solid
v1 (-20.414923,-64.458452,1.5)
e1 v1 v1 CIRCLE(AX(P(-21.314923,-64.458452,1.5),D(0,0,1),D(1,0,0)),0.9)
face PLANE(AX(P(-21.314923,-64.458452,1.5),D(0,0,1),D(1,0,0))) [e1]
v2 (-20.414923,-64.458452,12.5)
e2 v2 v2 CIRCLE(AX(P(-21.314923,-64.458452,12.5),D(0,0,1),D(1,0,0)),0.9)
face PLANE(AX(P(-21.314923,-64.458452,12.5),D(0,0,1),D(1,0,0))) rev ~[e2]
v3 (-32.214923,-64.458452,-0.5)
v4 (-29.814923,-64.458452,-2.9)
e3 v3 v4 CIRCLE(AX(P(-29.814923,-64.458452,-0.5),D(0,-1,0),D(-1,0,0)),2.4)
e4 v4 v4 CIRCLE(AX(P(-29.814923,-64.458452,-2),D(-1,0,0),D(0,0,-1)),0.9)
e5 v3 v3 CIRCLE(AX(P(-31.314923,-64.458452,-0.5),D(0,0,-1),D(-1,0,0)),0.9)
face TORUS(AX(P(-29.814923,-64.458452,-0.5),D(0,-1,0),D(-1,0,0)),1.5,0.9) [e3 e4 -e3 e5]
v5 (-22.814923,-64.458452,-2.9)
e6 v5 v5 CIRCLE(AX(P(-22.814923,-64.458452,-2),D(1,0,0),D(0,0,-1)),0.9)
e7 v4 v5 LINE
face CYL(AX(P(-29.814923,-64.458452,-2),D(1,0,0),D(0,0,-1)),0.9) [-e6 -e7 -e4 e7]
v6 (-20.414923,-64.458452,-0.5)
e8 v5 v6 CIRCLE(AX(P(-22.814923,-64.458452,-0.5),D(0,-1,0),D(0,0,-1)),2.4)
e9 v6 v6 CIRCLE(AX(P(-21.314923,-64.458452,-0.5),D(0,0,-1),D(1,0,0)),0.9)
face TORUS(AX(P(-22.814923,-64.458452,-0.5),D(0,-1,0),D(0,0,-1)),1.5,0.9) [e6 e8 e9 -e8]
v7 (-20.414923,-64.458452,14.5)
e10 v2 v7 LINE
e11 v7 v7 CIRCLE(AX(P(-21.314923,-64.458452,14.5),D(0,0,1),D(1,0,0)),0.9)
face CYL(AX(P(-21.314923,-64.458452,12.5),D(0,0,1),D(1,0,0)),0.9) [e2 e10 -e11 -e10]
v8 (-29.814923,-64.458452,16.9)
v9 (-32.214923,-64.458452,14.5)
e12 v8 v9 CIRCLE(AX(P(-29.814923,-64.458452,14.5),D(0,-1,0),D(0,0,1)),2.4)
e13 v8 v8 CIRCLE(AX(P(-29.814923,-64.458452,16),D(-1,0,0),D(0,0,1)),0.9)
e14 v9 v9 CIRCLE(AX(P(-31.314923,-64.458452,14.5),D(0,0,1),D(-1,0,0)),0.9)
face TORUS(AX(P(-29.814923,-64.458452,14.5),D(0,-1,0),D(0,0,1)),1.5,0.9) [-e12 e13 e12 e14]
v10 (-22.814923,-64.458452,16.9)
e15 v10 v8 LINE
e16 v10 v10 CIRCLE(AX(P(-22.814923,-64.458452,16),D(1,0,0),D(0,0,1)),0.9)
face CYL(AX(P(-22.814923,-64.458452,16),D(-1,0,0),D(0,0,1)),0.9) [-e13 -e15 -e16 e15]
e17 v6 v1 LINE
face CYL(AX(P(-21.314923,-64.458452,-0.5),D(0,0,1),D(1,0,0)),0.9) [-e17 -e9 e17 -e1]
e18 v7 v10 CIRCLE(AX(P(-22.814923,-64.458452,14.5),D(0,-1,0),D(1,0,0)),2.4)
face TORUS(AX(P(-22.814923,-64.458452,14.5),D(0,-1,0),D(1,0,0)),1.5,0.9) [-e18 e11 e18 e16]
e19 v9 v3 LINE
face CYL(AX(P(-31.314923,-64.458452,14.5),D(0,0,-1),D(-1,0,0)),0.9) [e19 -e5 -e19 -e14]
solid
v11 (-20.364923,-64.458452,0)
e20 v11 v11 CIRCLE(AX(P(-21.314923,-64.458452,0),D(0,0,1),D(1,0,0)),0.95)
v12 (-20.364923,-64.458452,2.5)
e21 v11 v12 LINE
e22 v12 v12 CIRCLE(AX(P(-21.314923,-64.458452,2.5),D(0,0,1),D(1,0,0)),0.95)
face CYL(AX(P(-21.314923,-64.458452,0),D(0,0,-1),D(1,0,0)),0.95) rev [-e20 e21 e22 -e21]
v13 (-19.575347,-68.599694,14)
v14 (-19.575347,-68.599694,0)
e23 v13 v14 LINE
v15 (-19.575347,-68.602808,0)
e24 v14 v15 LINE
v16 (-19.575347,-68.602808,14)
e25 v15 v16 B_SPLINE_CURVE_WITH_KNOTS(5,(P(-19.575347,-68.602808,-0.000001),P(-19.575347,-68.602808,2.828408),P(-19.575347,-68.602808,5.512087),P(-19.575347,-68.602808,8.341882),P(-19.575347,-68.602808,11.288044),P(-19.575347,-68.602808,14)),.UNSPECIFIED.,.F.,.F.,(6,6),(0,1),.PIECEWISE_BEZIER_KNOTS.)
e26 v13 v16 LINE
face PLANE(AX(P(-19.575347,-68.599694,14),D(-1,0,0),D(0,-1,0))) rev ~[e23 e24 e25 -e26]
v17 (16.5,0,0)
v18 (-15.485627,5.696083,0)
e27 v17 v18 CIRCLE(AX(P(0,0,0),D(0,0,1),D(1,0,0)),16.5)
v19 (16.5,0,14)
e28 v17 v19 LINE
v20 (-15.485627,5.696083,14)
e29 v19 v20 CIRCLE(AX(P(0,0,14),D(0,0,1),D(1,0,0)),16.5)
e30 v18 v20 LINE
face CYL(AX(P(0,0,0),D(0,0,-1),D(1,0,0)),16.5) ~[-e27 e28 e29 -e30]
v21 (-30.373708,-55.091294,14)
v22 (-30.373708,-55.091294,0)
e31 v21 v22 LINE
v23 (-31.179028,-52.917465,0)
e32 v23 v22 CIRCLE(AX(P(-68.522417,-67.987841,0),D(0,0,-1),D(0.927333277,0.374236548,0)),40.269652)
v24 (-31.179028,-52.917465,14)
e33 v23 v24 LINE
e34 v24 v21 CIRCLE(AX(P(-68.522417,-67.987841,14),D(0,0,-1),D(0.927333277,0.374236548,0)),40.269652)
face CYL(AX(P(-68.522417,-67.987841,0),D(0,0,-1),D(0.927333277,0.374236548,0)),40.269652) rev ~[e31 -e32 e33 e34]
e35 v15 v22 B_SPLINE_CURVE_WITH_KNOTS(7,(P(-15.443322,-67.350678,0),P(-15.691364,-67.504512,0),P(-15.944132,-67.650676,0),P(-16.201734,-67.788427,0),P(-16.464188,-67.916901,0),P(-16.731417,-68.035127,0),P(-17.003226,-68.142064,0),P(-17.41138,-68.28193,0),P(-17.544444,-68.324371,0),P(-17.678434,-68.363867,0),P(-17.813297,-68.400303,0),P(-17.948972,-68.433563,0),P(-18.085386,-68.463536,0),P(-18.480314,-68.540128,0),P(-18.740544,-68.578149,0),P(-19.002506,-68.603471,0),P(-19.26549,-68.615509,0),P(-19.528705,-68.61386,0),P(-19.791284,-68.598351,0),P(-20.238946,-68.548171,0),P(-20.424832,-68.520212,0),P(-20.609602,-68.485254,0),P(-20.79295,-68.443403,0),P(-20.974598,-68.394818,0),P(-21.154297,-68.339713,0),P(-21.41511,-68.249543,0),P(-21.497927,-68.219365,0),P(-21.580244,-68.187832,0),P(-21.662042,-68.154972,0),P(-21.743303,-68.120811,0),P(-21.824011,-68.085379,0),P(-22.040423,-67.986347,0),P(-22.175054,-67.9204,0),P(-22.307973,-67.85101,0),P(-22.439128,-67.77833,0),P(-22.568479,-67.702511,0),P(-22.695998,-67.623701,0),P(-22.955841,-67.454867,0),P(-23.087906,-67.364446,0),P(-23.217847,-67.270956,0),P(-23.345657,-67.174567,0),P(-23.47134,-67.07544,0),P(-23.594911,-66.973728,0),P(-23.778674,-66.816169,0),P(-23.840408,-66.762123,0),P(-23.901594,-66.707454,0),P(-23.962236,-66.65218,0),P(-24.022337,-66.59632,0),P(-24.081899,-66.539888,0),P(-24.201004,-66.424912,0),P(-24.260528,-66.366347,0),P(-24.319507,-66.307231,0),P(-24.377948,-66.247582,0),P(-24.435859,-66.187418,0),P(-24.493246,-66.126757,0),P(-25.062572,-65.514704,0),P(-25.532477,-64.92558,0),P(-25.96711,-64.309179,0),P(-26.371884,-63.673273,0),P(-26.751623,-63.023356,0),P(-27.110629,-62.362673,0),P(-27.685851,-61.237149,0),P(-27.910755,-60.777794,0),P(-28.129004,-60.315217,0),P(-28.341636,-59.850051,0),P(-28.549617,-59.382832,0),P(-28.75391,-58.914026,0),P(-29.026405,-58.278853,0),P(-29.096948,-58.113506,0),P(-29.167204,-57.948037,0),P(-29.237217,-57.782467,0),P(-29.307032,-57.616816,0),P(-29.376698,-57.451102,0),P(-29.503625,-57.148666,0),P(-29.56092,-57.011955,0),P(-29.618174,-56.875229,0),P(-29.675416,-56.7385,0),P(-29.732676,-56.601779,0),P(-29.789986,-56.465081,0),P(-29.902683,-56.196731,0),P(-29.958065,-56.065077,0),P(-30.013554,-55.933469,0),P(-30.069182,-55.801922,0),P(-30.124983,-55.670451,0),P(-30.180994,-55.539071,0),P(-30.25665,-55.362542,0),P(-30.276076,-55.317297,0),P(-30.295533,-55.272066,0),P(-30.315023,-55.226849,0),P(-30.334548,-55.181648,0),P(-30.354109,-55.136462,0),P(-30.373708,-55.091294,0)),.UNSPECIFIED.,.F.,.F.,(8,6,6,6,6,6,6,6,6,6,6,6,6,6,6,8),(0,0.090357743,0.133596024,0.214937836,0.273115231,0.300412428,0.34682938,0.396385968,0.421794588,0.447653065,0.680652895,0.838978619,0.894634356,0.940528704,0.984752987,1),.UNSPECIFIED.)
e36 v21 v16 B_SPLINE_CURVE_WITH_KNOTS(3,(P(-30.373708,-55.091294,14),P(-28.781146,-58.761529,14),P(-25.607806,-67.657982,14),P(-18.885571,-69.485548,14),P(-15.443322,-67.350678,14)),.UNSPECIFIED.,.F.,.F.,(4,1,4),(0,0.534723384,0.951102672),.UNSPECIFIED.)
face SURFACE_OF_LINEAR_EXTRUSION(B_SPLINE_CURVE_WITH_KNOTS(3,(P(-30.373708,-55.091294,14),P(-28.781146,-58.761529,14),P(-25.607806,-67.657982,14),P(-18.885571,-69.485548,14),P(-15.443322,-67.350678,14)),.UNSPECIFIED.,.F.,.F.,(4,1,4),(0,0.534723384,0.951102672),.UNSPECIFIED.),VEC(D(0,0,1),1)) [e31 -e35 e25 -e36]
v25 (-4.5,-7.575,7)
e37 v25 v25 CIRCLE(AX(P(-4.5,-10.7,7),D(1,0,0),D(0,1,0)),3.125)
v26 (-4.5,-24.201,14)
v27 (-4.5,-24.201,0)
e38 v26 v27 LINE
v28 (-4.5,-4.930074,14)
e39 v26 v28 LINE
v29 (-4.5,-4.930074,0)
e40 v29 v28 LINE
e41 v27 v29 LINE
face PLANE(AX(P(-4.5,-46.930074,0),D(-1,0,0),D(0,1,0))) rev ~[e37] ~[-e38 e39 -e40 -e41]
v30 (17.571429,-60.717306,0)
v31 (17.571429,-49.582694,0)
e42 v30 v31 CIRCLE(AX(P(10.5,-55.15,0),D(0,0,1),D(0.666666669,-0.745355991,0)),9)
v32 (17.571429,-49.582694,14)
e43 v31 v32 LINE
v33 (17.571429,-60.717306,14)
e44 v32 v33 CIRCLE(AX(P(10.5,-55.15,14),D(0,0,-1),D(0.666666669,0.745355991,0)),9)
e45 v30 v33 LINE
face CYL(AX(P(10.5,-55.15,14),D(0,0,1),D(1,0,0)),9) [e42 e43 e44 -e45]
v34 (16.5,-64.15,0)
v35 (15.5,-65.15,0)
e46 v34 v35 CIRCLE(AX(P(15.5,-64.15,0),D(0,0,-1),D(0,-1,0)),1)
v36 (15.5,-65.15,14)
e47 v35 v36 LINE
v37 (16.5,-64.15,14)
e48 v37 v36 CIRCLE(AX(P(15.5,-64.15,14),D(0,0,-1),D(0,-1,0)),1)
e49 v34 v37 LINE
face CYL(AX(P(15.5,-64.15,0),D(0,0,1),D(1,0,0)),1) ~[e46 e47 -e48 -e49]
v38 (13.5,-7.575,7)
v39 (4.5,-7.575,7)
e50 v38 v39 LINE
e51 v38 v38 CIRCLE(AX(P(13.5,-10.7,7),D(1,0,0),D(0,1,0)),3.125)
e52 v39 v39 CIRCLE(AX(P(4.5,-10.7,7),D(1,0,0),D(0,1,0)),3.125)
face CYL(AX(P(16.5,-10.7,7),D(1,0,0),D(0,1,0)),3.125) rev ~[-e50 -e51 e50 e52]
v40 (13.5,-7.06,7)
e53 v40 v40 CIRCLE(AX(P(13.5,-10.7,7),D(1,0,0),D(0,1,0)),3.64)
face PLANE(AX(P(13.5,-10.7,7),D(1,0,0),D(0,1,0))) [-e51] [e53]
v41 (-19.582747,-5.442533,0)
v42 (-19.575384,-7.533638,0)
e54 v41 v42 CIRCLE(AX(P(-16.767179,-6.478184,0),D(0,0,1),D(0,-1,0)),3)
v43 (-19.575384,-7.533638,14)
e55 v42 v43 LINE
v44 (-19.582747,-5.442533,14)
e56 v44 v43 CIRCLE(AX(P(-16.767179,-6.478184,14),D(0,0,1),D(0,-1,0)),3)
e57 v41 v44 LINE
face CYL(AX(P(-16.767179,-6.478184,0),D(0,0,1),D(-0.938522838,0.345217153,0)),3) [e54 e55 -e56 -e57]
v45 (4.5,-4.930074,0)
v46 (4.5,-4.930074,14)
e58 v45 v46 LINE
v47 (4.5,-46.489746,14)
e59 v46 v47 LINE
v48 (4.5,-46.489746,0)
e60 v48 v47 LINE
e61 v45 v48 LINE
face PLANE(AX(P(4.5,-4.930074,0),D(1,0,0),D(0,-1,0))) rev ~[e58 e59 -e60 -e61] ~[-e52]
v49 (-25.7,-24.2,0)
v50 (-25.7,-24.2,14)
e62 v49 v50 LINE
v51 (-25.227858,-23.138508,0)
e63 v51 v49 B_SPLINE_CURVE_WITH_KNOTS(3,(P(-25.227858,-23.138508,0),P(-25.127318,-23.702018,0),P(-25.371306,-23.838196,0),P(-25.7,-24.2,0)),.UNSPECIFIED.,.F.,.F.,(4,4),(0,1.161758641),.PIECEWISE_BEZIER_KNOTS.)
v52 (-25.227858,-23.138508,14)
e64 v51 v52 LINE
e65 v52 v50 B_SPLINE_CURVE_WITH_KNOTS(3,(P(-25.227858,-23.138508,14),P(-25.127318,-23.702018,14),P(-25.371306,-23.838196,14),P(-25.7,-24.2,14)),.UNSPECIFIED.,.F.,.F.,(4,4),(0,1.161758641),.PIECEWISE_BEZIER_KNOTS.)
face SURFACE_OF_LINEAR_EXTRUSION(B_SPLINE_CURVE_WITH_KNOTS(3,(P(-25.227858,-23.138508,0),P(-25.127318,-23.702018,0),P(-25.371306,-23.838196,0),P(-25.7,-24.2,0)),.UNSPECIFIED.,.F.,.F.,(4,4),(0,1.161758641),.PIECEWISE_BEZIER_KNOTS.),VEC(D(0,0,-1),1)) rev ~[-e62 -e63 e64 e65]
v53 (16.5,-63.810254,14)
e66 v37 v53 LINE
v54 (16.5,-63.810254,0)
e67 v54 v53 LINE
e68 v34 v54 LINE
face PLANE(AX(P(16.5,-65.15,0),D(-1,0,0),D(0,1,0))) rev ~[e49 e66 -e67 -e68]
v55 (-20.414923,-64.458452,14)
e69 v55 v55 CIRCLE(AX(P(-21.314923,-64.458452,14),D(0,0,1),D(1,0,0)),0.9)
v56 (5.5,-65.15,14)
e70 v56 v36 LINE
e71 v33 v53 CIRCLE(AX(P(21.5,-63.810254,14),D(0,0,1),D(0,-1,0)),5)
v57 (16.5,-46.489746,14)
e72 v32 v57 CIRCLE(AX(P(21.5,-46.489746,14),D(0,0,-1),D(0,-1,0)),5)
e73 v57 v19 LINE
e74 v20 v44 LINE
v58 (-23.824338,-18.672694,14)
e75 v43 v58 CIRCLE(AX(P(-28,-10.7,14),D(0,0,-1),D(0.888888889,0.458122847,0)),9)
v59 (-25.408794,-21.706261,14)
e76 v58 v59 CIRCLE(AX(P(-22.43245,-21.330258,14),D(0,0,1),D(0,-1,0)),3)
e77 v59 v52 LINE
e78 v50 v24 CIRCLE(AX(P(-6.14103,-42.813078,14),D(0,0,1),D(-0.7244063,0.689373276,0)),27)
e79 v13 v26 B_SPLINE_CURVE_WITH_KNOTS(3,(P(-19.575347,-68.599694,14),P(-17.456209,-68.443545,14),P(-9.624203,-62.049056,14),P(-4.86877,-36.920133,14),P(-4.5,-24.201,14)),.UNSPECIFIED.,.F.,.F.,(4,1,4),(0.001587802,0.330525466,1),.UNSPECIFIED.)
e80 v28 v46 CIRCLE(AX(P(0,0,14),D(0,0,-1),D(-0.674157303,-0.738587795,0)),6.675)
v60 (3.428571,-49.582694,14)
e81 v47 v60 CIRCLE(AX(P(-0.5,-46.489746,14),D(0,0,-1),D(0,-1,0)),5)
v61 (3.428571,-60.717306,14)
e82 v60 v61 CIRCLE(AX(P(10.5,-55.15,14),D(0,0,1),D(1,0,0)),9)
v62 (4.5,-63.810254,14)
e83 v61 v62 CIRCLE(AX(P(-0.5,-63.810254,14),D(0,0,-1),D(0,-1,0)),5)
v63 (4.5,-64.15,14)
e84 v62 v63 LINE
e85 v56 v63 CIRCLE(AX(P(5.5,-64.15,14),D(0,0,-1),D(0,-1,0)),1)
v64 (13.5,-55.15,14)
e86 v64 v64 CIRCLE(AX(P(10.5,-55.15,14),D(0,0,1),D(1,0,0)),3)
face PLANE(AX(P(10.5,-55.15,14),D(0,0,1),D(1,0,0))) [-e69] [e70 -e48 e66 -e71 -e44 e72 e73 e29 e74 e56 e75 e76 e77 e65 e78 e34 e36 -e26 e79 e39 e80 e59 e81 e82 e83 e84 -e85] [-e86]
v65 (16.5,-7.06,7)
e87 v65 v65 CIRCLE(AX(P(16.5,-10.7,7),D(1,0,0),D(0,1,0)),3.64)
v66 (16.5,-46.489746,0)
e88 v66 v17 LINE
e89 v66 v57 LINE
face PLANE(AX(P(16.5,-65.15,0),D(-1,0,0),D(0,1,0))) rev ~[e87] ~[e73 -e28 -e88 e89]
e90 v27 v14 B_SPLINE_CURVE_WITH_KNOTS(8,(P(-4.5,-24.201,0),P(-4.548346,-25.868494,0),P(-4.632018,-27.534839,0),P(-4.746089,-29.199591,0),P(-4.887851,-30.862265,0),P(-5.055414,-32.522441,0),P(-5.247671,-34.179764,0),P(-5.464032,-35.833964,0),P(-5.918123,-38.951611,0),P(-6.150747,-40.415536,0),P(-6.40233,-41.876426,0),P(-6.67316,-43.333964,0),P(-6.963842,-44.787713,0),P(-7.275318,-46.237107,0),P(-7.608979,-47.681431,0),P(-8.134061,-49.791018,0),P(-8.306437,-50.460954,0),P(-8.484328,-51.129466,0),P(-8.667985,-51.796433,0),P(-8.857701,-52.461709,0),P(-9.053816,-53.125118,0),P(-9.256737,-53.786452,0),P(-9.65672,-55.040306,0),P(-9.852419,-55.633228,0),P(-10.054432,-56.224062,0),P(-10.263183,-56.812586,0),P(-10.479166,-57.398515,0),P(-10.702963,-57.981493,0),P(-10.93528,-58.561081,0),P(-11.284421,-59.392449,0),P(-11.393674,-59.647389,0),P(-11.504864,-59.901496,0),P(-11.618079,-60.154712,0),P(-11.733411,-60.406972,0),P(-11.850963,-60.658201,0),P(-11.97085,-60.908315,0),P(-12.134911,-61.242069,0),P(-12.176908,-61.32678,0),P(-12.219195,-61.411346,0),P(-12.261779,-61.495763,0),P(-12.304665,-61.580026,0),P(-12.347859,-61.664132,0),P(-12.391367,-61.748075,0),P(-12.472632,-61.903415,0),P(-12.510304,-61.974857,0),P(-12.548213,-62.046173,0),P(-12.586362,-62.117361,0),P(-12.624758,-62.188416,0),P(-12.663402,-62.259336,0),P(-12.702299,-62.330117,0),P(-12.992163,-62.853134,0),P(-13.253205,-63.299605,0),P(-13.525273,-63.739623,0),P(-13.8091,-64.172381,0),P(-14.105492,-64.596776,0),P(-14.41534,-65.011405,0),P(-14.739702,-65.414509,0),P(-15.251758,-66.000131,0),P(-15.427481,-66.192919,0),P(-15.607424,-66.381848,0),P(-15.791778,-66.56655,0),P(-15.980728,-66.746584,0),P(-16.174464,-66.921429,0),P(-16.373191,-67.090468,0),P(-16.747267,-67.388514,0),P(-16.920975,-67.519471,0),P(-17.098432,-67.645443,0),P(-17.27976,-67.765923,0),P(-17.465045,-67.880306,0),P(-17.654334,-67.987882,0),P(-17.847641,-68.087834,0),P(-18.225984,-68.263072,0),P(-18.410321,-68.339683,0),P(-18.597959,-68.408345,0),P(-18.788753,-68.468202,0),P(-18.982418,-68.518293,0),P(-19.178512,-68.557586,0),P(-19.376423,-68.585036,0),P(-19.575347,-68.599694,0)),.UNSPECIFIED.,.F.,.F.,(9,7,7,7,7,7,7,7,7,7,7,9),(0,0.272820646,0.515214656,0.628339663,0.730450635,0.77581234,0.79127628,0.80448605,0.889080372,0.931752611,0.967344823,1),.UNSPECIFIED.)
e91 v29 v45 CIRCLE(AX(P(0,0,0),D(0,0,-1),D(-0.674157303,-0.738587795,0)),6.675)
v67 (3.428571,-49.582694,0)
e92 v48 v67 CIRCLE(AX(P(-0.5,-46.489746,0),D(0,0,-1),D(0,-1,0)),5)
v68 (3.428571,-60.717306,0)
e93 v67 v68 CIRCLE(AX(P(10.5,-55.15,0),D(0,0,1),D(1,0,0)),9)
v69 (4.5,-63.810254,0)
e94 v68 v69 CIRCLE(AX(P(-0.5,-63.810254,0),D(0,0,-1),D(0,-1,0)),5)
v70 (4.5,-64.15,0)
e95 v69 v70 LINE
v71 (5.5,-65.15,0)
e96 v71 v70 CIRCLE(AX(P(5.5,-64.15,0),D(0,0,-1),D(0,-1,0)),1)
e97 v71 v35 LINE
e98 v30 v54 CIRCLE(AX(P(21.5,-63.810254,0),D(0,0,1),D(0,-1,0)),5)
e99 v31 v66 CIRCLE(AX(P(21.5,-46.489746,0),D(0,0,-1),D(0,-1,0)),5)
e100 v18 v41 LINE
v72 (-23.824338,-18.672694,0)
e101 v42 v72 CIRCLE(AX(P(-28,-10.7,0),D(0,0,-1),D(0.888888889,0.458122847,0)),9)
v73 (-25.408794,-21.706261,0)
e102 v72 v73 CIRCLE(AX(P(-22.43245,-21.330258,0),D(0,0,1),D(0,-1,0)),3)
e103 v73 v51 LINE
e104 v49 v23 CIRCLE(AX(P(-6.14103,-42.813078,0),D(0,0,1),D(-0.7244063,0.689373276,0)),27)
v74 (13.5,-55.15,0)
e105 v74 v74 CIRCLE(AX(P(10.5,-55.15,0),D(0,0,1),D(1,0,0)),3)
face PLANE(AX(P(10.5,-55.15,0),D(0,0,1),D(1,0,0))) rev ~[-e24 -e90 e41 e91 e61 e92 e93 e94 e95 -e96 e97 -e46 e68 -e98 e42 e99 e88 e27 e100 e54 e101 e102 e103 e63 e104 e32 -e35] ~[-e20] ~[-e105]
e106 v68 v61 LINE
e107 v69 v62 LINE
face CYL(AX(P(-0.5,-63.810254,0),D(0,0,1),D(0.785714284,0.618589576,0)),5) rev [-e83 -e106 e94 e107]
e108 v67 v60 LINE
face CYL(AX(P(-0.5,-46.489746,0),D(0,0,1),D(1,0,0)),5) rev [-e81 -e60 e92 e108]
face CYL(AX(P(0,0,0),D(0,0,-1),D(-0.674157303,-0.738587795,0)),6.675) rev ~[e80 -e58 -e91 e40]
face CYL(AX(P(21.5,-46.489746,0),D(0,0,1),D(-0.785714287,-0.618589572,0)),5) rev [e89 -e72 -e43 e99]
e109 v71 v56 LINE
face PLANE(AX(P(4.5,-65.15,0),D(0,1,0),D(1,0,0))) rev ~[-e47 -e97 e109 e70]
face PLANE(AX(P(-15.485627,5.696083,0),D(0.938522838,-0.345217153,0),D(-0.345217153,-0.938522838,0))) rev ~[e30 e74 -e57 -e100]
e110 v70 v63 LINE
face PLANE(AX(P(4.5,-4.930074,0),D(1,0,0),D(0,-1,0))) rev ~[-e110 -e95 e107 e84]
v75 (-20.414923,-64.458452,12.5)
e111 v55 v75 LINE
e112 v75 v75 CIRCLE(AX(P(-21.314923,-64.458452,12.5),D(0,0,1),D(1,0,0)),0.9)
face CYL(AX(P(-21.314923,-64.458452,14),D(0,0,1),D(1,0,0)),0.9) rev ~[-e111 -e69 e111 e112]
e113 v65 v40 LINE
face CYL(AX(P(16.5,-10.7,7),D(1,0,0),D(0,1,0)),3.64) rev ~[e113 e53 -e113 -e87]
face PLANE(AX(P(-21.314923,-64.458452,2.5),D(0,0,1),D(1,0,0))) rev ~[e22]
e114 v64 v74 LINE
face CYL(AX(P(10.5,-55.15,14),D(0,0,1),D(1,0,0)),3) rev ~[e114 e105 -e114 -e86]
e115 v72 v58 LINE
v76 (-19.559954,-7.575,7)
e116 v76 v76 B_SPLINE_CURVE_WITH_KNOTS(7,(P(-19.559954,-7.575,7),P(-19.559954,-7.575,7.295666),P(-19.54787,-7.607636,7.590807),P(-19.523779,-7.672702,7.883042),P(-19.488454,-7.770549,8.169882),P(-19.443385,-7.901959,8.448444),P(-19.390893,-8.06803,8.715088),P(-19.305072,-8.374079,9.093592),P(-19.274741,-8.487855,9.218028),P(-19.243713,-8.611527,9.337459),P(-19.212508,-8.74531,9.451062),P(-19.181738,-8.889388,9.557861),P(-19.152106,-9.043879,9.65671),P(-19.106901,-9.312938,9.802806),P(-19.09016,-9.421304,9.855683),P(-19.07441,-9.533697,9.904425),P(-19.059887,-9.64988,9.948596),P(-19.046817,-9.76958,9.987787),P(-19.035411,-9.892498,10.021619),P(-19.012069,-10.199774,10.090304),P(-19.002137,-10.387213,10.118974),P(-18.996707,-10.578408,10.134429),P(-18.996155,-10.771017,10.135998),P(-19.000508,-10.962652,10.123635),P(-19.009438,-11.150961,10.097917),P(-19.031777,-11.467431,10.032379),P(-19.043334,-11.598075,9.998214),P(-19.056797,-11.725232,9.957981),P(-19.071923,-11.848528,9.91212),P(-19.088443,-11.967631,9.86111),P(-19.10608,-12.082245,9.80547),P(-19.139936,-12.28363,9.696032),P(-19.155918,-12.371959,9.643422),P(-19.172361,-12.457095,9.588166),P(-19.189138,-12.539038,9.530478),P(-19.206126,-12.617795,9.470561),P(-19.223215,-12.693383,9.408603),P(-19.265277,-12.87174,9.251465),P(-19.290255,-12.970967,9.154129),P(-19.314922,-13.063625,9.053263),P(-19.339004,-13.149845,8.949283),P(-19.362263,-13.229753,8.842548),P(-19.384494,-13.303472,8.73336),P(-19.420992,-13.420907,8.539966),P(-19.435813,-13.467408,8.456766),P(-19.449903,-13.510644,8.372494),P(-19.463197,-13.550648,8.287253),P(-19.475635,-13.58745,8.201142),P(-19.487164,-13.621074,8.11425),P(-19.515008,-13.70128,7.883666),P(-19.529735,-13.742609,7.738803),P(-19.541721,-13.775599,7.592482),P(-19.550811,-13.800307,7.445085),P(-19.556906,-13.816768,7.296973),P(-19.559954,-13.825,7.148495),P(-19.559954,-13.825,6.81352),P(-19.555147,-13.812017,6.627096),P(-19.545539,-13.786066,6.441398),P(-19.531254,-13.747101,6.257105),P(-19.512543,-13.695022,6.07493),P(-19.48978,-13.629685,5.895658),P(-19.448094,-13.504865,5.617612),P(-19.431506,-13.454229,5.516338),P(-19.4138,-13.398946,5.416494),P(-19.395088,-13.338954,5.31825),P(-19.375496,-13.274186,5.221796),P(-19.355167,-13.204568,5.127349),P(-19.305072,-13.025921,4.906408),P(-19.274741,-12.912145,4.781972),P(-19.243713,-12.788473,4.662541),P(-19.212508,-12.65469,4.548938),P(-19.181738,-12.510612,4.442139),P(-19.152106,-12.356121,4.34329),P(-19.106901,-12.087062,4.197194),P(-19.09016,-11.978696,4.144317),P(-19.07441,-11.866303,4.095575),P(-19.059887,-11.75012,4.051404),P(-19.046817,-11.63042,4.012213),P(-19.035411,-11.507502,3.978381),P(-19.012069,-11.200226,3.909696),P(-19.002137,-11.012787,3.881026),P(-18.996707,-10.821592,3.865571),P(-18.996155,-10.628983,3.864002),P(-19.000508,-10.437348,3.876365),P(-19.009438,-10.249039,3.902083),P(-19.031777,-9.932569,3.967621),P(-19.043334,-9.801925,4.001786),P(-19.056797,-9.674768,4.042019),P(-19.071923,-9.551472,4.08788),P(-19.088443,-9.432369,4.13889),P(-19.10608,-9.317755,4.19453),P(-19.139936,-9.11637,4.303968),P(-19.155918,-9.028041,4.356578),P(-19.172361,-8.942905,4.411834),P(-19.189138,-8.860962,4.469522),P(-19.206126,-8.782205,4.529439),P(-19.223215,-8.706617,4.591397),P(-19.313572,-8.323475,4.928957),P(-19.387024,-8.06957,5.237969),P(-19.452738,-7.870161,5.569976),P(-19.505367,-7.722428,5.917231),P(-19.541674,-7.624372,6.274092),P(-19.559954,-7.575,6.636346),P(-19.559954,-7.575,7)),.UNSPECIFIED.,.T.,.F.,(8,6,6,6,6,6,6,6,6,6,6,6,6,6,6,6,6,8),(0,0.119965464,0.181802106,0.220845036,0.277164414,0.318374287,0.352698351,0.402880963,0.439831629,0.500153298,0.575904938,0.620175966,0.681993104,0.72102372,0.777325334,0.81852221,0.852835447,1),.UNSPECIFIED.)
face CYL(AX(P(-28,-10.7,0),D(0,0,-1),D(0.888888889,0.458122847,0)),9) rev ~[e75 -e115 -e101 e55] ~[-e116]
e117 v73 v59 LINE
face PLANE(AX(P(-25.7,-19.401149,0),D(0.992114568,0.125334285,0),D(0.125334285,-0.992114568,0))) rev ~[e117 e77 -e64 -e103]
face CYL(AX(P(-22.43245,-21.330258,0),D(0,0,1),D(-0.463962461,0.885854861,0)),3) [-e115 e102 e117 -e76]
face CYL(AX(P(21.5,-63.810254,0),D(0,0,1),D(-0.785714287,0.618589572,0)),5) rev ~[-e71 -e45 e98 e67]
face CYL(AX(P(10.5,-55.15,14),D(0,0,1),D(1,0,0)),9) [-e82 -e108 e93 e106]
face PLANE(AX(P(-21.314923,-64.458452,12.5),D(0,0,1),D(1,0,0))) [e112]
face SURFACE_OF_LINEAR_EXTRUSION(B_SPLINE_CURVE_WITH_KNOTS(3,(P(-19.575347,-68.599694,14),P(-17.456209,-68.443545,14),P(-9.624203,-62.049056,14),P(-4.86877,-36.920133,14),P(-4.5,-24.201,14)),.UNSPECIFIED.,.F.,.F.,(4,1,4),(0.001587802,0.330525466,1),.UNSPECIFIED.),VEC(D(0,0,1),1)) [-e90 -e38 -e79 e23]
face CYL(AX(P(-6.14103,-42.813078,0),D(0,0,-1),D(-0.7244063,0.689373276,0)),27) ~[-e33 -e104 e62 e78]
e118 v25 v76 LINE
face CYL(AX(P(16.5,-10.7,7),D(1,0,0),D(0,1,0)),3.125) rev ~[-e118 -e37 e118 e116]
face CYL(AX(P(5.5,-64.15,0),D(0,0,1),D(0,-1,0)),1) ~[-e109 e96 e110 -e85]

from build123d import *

# Parameters (mm, degrees)
F2_DEPTH  = 14
F3_R      = 3.125
F4_DEPTH  = 49.6420300093
F5_R      = 3
F9_R      = 1
F10_R     = 0.95
F11_DEPTH = 1.5
F12_R     = 0.9
F13_DEPTH = 2.5
F16_R     = 3.64
F17_DEPTH = 3
F19_DEPTH = 14.0010001
F20_R     = 9
F21_DEPTH = 14
F22_R     = 5
F25_DEPTH = 14.0010007
F8_R      = 3
F26_DEPTH = 14.0010012987
F27_R     = 0.95
F28_DEPTH = 2.5
F33_R     = 0.9
F36_R     = 0.9
F37_DEPTH = 1.5


# Not quite as in the source:
# - two fillets or chamfers of one size are made in one step


with BuildPart() as f2:
    # F1 (on Top) → F2 (new body)
    with BuildSketch(Plane.XY):
        with BuildLine():
            Line((-15.4856268226, 5.6960830324), (-20, -6.5768943744))
            ThreePointArc((-20, -6.5768943744), (-19.7757748744, -14.3554235164), (-25.7, -19.4011493494))
            Line((-25.7, -19.4011493494), (-25.2278577536, -23.1385082006))
            add(Edge.make_bspline(
                [(-25.2278577536, -23.1385082006), (-25.1273177564, -23.7020179629), (-25.3713056445, -23.8381959498), (-25.7, -24.2)],
                knots=[0, 0, 0, 0, 1.1617586414, 1.1617586414, 1.1617586414, 1.1617586414], degree=3))
            ThreePointArc((-25.7, -24.2), (-32.6626362635, -37.7529997453), (-31.1790283826, -52.9174652318))
            ThreePointArc((-31.1790283826, -52.9174652318), (-28.6976903426, -62.0182478093), (-28.4015750264, -71.4465879449))
            ThreePointArc((-28.4015750264, -71.4465879449), (-11.4642077603, -64.0498338065), (-4.5, -46.9300735289))
            Line((-4.5, -46.9300735289), (-4.5, -4.9300735289))
            ThreePointArc((-4.5, -4.9300735289), (0, 6.675), (4.5, -4.9300735289))
            Line((4.5, -4.9300735289), (4.5, -65.15))
            Line((4.5, -65.15), (16.5, -65.15))
            Line((16.5, -65.15), (16.5, 0))
            ThreePointArc((16.5, 0), (2.8928495837, 16.2444273918), (-15.4856268226, 5.6960830324))
        make_face()
    extrude(amount=F2_DEPTH)

    # F3 (on face) → F4 (cut, through all)
    with BuildSketch(Plane.YZ.offset(16.5)):
        with Locations((-10.7, 7)):
            Circle(F3_R)
    extrude(amount=-F4_DEPTH, mode=Mode.SUBTRACT)

    # F5
    f5_edges = [f2.edges().sort_by_distance(p)[0] for p in [
        (-20, -6.576894, 7),
        (-25.7, -19.401149, 7),
    ]]
    fillet(f5_edges, radius=F5_R)

    # F9
    f9_edges = [f2.edges().sort_by_distance(p)[0] for p in [
        (4.5, -65.15, 7),
        (16.5, -65.15, 7),
    ]]
    fillet(f9_edges, radius=F9_R)

    # F10 (on Top) → F11 (cut)
    with BuildSketch(Plane.XY):
        with Locations((-21.3149227048, -64.4584521651)):
            Circle(F10_R)
    extrude(amount=F11_DEPTH, mode=Mode.SUBTRACT)

    # F12 (on face) → F13 (cut)
    with BuildSketch(Plane.XY.offset(14)):
        with Locations((-21.3149227048, -64.4584521651)):
            Circle(F12_R)
    extrude(amount=-F13_DEPTH, mode=Mode.SUBTRACT)

    # F16 (on face) → F17 (cut)
    with BuildSketch(Plane.YZ.offset(16.5)):
        with Locations((-10.7, 7)):
            Circle(F16_R)
    extrude(amount=-F17_DEPTH, mode=Mode.SUBTRACT)

    # F18 (on face) → F19 (cut, through all)
    with BuildSketch(Plane.XY.offset(14)):
        with BuildLine():
            ThreePointArc((-28.3963022067, -71.3848695159), (-28.5460846486, -63.1362693547), (-30.3737083693, -55.0912938461))
            Line((-30.3737083693, -55.0912938461), (-30.3737083693, -71.3848695159))
            Line((-30.3737083693, -71.3848695159), (-28.3963022067, -71.3848695159))
        make_face()
        with BuildLine():
            add(Edge.make_bspline(
                [(-30.3737083693, -55.0912938461), (-28.7811456911, -58.7615291796), (-25.6078056235, -67.6579822093), (-18.8855712515, -69.4855479183), (-15.4433224508, -67.3506777059)],
                knots=[0, 0, 0, 0, 0.5347233839, 0.9511026719, 0.9511026719, 0.9511026719, 0.9511026719], degree=3))
            ThreePointArc((-30.3737083693, -55.0912938461), (-28.5460846486, -63.1362693547), (-28.3963022067, -71.3848695159))
            Line((-28.3963022067, -71.3848695159), (-27.1777050831, -71.3848695159))
            ThreePointArc((-27.1777050831, -71.3848695159), (-21.0511507412, -70.1221911319), (-15.4433224508, -67.3506777059))
        make_face()
        with BuildLine():
            add(Edge.make_bspline(
                [(-15.4433224508, -67.3506777059), (-15.0390833975, -67.0999701122), (-14.6279578713, -66.8087869354), (-14.2102387128, -66.474569073)],
                knots=[0.9511026719, 0.9511026719, 0.9511026719, 0.9511026719, 1, 1, 1, 1], degree=3))
            ThreePointArc((-15.4433224508, -67.3506777059), (-21.0511507412, -70.1221911319), (-27.1777050831, -71.3848695159))
            Line((-27.1777050831, -71.3848695159), (-14.2102387128, -71.3848695159))
            Line((-14.2102387128, -71.3848695159), (-14.2102387128, -66.474569073))
        make_face()
        with BuildLine():
            Line((-27.1777050831, -71.3848695159), (-28.3963022067, -71.3848695159))
            ThreePointArc((-28.3963022067, -71.3848695159), (-28.3989267496, -71.4157297442), (-28.4015750264, -71.4465879449))
            ThreePointArc((-28.4015750264, -71.4465879449), (-27.7892545048, -71.4233741447), (-27.1777050831, -71.3848695159))
        make_face()
    extrude(amount=-F19_DEPTH, mode=Mode.SUBTRACT)

    # F20 (on face) → F21 (join)
    with BuildSketch(Plane.XY.offset(14)):
        with Locations((10.4999999818, -55.15)):
            Circle(F20_R)
    extrude(amount=-F21_DEPTH)

    # F22
    f22_edges = [f2.edges().sort_by_distance(p)[0] for p in [
        (16.5, -48.441796, 7),
        (16.5, -61.858204, 7),
        (4.5, -61.858204, 7),
        (4.5, -48.441796, 7),
    ]]
    fillet(f22_edges, radius=F22_R)

    # F24 (on face) → F25 (cut, through all)
    with BuildSketch(Plane.XY.offset(14)):
        with BuildLine():
            add(Edge.make_bspline(
                [(-19.5753466443, -68.5996938374), (-17.4562091898, -68.4435449264), (-9.6242033598, -62.0490559295), (-4.8687699722, -36.9201331283), (-4.5, -24.2009996242)],
                knots=[0.0015878016, 0.0015878016, 0.0015878016, 0.0015878016, 0.3305254663, 1, 1, 1, 1], degree=3))
            Line((-19.5753466443, -68.5996938374), (-19.5753466443, -69.6116682716))
            Line((-19.5753466443, -69.6116682716), (-2.4172839959, -69.6116682716))
            Line((-2.4172839959, -69.6116682716), (-2.4172839959, -24.2009996242))
            Line((-2.4172839959, -24.2009996242), (-4.5, -24.2009996242))
        make_face()
    extrude(amount=-F25_DEPTH, mode=Mode.SUBTRACT)

    # F8 (on face) → F26 (cut, through all)
    with BuildSketch(Plane.XY.offset(14)):
        with Locations((10.5, -55.15)):
            Circle(F8_R)
    extrude(amount=-F26_DEPTH, mode=Mode.SUBTRACT)

    # F27 (on face) → F28 (cut)
    with BuildSketch(Plane.XY):
        with Locations((-21.3149227048, -64.4584521651)):
            Circle(F27_R)
    extrude(amount=F28_DEPTH, mode=Mode.SUBTRACT)

    # F36 (on offset) → F37 (join)
    with BuildSketch(Plane.XY.offset(12.5)):
        with Locations((-21.3149227048, -64.4584521651)):
            Circle(F36_R)
    extrude(amount=-F37_DEPTH)


with BuildPart() as f34:
    # F34: sweep along a path in F31
    with BuildLine(Plane.XZ.offset(64.45845)) as f34_path:
        Line((-21.3149227048, 12.5), (-21.3149227048, 14.5))
        ThreePointArc((-21.3149227048, 14.5), (-21.754262533, 15.5606601718), (-22.8149227048, 16))
        Line((-22.8149227048, 16), (-29.8149227048, 16))
        ThreePointArc((-29.8149227048, 16), (-30.8755828765, 15.5606601718), (-31.3149227048, 14.5))
        Line((-31.3149227048, 14.5), (-31.3149227048, -0.5))
        ThreePointArc((-31.3149227048, -0.5), (-30.8755828765, -1.5606601718), (-29.8149227048, -2))
        Line((-29.8149227048, -2), (-22.8149227048, -2))
        ThreePointArc((-22.8149227048, -2), (-21.754262533, -1.5606601718), (-21.3149227048, -0.5))
        Line((-21.3149227048, -0.5), (-21.3149227048, 1.5))
    # F33 (on offset) → F34 (sweep)
    with BuildSketch(Plane.XY.offset(12.5)):
        with Locations((-21.3149227048, -64.4584521651)):
            Circle(F33_R)
    sweep(path=f34_path.line)


solid = Compound([f2.part, f34.part])
